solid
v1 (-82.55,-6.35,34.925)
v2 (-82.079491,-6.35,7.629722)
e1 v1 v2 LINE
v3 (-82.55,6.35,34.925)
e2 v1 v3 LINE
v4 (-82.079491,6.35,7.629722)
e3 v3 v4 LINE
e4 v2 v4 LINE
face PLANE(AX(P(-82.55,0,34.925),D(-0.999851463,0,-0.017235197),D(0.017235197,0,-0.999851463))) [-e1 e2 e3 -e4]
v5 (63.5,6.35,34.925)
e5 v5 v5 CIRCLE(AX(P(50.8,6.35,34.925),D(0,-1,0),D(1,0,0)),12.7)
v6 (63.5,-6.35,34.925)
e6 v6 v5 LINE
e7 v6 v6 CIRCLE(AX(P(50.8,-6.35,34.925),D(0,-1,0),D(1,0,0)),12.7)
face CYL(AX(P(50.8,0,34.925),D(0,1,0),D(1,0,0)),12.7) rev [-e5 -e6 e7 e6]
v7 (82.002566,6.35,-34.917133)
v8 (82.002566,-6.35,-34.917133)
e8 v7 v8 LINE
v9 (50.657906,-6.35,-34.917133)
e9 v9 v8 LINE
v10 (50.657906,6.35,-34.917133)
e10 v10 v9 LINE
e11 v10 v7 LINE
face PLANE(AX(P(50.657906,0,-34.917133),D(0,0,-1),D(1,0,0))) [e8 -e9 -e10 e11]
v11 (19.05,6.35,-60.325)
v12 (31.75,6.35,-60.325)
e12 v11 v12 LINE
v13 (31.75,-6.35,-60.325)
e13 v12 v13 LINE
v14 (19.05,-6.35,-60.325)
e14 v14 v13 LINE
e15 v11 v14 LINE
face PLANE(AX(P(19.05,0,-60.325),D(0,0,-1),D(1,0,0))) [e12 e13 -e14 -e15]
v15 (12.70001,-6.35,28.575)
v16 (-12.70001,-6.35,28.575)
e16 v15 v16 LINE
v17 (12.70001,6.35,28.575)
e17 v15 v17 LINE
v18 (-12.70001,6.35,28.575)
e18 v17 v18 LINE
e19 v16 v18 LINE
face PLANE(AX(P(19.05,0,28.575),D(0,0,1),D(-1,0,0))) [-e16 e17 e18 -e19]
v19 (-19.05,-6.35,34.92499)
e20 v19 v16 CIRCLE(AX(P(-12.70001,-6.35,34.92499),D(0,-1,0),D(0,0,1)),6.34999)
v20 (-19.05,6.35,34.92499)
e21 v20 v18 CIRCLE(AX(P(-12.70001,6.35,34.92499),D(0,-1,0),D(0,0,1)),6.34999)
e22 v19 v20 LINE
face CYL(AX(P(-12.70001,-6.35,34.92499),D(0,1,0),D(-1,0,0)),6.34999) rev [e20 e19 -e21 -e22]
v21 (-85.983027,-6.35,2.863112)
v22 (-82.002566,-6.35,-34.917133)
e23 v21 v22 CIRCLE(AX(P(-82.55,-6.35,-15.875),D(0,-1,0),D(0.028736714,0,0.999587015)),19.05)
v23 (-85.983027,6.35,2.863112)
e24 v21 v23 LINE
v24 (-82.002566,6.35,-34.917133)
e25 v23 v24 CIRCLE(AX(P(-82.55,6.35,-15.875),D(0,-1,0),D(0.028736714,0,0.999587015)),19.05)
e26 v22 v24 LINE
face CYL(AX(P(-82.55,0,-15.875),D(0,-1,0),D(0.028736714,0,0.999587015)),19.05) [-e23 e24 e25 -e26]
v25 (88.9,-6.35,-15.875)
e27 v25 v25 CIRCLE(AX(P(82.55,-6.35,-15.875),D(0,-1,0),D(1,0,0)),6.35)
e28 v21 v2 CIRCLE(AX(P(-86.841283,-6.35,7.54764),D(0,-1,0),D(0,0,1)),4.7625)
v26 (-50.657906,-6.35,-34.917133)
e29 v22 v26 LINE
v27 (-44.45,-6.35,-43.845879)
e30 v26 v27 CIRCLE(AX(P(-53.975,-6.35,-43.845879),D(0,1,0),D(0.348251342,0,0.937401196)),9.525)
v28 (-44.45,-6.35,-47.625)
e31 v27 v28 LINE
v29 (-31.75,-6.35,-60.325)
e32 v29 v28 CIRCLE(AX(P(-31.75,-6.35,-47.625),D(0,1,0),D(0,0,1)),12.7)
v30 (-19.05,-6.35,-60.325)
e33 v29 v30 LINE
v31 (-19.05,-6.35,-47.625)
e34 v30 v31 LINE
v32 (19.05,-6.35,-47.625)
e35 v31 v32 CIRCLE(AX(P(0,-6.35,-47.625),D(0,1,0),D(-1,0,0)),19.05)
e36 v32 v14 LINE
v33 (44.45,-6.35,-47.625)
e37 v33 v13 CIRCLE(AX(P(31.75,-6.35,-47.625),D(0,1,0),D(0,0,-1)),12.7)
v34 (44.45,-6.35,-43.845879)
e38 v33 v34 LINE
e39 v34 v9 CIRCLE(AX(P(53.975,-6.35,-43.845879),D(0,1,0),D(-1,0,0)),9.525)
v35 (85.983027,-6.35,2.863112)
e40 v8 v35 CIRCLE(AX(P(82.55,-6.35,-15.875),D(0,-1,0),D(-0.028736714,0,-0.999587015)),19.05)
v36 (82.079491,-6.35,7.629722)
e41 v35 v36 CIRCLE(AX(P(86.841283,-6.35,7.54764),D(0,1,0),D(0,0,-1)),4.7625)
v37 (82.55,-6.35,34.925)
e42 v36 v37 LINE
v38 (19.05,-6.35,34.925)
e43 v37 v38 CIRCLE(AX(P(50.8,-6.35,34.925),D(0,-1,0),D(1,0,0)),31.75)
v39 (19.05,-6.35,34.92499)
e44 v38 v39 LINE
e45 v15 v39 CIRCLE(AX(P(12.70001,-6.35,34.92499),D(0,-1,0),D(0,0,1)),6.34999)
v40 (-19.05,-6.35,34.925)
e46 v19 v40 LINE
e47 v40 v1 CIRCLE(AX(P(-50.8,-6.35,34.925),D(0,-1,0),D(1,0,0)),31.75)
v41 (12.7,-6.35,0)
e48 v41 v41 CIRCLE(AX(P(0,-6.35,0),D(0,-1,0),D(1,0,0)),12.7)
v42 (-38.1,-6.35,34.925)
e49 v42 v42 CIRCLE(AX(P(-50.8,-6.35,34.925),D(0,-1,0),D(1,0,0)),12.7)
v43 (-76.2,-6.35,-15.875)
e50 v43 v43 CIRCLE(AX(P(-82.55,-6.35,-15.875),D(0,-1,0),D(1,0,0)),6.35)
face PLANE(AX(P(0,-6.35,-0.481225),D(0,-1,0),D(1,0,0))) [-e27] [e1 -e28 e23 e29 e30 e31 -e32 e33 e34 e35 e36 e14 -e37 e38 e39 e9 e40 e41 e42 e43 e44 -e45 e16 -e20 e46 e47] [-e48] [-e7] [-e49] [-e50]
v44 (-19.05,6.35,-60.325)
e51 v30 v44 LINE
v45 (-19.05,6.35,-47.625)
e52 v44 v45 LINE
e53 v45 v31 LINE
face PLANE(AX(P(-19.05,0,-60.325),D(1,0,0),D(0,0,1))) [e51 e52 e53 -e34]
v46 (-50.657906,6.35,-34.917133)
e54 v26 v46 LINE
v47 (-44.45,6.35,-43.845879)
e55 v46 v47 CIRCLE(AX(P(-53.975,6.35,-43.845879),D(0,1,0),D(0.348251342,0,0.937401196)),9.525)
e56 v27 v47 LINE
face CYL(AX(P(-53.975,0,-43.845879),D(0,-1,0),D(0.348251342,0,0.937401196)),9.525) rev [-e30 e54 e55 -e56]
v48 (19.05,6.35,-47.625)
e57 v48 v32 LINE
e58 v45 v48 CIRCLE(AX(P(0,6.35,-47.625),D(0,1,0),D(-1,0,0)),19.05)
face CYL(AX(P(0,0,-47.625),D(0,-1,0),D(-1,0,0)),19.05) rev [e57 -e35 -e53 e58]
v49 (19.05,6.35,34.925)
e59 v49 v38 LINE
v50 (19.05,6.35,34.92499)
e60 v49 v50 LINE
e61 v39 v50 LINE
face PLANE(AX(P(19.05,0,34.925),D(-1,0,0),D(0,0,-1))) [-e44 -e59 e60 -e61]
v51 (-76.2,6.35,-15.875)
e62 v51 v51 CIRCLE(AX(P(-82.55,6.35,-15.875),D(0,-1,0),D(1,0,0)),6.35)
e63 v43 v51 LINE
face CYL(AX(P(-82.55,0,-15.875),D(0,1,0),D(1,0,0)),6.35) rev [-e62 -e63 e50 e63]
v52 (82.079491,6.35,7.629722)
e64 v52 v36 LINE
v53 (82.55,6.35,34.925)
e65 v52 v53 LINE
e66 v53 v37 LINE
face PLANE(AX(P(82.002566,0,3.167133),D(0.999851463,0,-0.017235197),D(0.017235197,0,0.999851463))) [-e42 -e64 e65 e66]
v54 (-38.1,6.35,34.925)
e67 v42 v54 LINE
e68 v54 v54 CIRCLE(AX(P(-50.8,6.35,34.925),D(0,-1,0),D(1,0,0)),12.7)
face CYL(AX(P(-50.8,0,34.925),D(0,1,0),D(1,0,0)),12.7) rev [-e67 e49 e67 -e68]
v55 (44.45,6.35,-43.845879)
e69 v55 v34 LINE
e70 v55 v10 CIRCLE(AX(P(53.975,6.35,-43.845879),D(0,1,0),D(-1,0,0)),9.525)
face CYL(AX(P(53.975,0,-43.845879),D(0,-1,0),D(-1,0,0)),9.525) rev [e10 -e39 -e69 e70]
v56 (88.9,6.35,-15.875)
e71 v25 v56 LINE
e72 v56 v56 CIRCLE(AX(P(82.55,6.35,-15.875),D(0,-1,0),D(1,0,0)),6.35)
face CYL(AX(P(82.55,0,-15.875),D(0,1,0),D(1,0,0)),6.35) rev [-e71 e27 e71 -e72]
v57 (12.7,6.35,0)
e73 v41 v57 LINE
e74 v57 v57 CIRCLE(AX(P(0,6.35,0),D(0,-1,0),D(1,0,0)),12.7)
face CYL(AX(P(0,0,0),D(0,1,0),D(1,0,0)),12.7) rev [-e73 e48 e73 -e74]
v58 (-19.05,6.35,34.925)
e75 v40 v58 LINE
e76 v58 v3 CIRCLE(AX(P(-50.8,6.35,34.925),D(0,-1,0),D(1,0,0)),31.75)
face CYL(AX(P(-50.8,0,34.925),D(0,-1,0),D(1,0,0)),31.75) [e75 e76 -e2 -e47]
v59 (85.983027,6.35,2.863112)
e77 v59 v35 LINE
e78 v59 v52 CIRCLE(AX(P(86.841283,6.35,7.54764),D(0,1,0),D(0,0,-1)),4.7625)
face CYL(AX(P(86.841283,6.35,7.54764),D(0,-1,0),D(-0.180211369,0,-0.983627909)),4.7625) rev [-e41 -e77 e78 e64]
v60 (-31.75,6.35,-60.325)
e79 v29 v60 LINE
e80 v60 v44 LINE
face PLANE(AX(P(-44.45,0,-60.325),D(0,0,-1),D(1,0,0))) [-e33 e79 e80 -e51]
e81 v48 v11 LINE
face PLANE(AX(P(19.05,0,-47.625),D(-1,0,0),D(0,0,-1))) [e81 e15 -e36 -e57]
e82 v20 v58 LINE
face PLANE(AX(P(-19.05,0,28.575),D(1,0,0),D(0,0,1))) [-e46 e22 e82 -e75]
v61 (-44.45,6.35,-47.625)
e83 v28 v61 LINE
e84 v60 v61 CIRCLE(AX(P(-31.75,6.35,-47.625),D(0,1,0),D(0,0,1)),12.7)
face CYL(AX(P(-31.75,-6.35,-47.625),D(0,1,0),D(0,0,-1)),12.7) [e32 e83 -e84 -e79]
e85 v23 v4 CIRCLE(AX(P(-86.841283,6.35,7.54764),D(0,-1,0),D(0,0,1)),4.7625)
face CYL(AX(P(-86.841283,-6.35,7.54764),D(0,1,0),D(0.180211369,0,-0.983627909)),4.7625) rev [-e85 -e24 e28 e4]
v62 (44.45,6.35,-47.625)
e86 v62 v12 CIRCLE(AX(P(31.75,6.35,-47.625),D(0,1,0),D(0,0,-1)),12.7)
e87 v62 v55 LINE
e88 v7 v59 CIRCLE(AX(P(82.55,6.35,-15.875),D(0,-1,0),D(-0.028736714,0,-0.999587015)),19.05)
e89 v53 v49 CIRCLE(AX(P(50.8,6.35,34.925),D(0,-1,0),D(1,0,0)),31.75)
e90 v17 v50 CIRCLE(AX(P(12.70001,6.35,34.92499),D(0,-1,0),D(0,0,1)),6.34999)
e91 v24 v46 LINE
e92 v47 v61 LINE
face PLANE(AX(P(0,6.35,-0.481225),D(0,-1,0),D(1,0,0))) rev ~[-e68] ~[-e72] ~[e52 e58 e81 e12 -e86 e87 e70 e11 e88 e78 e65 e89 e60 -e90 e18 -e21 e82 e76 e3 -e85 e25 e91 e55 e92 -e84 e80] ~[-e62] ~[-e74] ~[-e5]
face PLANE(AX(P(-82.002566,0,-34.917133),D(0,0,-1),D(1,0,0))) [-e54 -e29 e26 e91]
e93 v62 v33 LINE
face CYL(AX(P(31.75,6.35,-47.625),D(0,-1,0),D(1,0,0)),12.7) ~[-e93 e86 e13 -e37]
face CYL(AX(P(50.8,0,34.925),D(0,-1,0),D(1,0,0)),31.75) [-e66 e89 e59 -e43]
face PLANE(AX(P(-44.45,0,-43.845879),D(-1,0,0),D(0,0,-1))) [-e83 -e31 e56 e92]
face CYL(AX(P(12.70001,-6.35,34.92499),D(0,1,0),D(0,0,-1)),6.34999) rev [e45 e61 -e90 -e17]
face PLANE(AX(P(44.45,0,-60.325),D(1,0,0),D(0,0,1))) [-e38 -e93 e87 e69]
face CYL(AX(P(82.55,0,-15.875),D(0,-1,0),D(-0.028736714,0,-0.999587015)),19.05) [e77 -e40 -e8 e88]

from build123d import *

# Parameters (mm, degrees)
F0_R     = 9.525
F0_R_2   = 12.7
F0_R_3   = 6.35
F1_DEPTH = 6.35
F2_R     = 12.7
F3_R     = 4.7625
F4_R     = 6.34999


# Not quite as in the source:
# - a fillet or chamfer is up to 0.001 mm smaller than in the source, because OpenCascade refuses the exact size


with BuildPart() as f1:
    # F0 (on Front) → F1 (new body, symmetric)
    with BuildSketch(Plane.XZ):
        with BuildLine():
            Line((-19.05, -60.325), (-19.05, -47.625))
            ThreePointArc((-19.05, -47.625), (0, -28.575), (19.05, -47.625))
            Line((19.05, -47.625), (19.05, -60.325))
            Line((19.05, -60.325), (44.45, -60.325))
            Line((44.45, -60.325), (44.45, -43.8458790377))
            ThreePointArc((44.45, -43.8458790377), (46.1544838519, -38.4084943559), (50.6579059691, -34.9171326425))
            Line((50.6579059691, -34.9171326425), (82.0025655956, -34.9171326425))
            ThreePointArc((82.0025655956, -34.9171326425), (101.6, -15.875), (82.0025655956, 3.1671326425))
            Line((82.0025655956, 3.1671326425), (82.55, 34.925))
            ThreePointArc((82.55, 34.925), (50.8, 66.675), (19.05, 34.925))
            Line((19.05, 34.925), (19.05, 28.575))
            Line((19.05, 28.575), (-19.05, 28.575))
            Line((-19.05, 28.575), (-19.05, 34.925))
            ThreePointArc((-19.05, 34.925), (-50.8, 66.675), (-82.55, 34.925))
            Line((-82.55, 34.925), (-82.0025655956, 3.1671326425))
            ThreePointArc((-82.0025655956, 3.1671326425), (-101.6, -15.875), (-82.0025655956, -34.9171326425))
            Line((-82.0025655956, -34.9171326425), (-50.6579059691, -34.9171326425))
            ThreePointArc((-50.6579059691, -34.9171326425), (-46.1544838519, -38.4084943559), (-44.45, -43.8458790377))
            Line((-44.45, -43.8458790377), (-44.45, -60.325))
            Line((-44.45, -60.325), (-19.05, -60.325))
        make_face()
        with Locations((-82.55, -15.875)):
            Circle(F0_R, mode=Mode.SUBTRACT)
        Circle(F0_R_2, mode=Mode.SUBTRACT)
        with Locations((82.55, -15.875)):
            Circle(F0_R, mode=Mode.SUBTRACT)
        with Locations((-50.8, 34.925)):
            Circle(F0_R_2, mode=Mode.SUBTRACT)
        with Locations((50.8, 34.925)):
            Circle(F0_R_2, mode=Mode.SUBTRACT)
        with Locations((82.55, -15.875)):
            Circle(F0_R)
        with Locations((82.55, -15.875)):
            Circle(F0_R_3, mode=Mode.SUBTRACT)
        with Locations((-82.55, -15.875)):
            Circle(F0_R)
        with Locations((-82.55, -15.875)):
            Circle(F0_R_3, mode=Mode.SUBTRACT)
    extrude(amount=F1_DEPTH, both=True)

    # F2
    f2_edges = [f1.edges().sort_by_distance(p)[0] for p in [
        (-44.45, 0, -60.325),
        (44.45, 0, -60.325),
    ]]
    fillet(f2_edges, radius=F2_R)

    # F3
    f3_edges = [f1.edges().sort_by_distance(p)[0] for p in [
        (-82.002566, 0, 3.167133),
        (82.002566, 0, 3.167133),
    ]]
    fillet(f3_edges, radius=F3_R)

    # F4 (radius 6.35 in the source; OpenCascade refuses exactly that, so slightly less here)
    f4_edges = [f1.edges().sort_by_distance(p)[0] for p in [
        (-19.05, 0, 28.575),
        (19.05, 0, 28.575),
    ]]
    fillet(f4_edges, radius=F4_R)


solid = f1.part
